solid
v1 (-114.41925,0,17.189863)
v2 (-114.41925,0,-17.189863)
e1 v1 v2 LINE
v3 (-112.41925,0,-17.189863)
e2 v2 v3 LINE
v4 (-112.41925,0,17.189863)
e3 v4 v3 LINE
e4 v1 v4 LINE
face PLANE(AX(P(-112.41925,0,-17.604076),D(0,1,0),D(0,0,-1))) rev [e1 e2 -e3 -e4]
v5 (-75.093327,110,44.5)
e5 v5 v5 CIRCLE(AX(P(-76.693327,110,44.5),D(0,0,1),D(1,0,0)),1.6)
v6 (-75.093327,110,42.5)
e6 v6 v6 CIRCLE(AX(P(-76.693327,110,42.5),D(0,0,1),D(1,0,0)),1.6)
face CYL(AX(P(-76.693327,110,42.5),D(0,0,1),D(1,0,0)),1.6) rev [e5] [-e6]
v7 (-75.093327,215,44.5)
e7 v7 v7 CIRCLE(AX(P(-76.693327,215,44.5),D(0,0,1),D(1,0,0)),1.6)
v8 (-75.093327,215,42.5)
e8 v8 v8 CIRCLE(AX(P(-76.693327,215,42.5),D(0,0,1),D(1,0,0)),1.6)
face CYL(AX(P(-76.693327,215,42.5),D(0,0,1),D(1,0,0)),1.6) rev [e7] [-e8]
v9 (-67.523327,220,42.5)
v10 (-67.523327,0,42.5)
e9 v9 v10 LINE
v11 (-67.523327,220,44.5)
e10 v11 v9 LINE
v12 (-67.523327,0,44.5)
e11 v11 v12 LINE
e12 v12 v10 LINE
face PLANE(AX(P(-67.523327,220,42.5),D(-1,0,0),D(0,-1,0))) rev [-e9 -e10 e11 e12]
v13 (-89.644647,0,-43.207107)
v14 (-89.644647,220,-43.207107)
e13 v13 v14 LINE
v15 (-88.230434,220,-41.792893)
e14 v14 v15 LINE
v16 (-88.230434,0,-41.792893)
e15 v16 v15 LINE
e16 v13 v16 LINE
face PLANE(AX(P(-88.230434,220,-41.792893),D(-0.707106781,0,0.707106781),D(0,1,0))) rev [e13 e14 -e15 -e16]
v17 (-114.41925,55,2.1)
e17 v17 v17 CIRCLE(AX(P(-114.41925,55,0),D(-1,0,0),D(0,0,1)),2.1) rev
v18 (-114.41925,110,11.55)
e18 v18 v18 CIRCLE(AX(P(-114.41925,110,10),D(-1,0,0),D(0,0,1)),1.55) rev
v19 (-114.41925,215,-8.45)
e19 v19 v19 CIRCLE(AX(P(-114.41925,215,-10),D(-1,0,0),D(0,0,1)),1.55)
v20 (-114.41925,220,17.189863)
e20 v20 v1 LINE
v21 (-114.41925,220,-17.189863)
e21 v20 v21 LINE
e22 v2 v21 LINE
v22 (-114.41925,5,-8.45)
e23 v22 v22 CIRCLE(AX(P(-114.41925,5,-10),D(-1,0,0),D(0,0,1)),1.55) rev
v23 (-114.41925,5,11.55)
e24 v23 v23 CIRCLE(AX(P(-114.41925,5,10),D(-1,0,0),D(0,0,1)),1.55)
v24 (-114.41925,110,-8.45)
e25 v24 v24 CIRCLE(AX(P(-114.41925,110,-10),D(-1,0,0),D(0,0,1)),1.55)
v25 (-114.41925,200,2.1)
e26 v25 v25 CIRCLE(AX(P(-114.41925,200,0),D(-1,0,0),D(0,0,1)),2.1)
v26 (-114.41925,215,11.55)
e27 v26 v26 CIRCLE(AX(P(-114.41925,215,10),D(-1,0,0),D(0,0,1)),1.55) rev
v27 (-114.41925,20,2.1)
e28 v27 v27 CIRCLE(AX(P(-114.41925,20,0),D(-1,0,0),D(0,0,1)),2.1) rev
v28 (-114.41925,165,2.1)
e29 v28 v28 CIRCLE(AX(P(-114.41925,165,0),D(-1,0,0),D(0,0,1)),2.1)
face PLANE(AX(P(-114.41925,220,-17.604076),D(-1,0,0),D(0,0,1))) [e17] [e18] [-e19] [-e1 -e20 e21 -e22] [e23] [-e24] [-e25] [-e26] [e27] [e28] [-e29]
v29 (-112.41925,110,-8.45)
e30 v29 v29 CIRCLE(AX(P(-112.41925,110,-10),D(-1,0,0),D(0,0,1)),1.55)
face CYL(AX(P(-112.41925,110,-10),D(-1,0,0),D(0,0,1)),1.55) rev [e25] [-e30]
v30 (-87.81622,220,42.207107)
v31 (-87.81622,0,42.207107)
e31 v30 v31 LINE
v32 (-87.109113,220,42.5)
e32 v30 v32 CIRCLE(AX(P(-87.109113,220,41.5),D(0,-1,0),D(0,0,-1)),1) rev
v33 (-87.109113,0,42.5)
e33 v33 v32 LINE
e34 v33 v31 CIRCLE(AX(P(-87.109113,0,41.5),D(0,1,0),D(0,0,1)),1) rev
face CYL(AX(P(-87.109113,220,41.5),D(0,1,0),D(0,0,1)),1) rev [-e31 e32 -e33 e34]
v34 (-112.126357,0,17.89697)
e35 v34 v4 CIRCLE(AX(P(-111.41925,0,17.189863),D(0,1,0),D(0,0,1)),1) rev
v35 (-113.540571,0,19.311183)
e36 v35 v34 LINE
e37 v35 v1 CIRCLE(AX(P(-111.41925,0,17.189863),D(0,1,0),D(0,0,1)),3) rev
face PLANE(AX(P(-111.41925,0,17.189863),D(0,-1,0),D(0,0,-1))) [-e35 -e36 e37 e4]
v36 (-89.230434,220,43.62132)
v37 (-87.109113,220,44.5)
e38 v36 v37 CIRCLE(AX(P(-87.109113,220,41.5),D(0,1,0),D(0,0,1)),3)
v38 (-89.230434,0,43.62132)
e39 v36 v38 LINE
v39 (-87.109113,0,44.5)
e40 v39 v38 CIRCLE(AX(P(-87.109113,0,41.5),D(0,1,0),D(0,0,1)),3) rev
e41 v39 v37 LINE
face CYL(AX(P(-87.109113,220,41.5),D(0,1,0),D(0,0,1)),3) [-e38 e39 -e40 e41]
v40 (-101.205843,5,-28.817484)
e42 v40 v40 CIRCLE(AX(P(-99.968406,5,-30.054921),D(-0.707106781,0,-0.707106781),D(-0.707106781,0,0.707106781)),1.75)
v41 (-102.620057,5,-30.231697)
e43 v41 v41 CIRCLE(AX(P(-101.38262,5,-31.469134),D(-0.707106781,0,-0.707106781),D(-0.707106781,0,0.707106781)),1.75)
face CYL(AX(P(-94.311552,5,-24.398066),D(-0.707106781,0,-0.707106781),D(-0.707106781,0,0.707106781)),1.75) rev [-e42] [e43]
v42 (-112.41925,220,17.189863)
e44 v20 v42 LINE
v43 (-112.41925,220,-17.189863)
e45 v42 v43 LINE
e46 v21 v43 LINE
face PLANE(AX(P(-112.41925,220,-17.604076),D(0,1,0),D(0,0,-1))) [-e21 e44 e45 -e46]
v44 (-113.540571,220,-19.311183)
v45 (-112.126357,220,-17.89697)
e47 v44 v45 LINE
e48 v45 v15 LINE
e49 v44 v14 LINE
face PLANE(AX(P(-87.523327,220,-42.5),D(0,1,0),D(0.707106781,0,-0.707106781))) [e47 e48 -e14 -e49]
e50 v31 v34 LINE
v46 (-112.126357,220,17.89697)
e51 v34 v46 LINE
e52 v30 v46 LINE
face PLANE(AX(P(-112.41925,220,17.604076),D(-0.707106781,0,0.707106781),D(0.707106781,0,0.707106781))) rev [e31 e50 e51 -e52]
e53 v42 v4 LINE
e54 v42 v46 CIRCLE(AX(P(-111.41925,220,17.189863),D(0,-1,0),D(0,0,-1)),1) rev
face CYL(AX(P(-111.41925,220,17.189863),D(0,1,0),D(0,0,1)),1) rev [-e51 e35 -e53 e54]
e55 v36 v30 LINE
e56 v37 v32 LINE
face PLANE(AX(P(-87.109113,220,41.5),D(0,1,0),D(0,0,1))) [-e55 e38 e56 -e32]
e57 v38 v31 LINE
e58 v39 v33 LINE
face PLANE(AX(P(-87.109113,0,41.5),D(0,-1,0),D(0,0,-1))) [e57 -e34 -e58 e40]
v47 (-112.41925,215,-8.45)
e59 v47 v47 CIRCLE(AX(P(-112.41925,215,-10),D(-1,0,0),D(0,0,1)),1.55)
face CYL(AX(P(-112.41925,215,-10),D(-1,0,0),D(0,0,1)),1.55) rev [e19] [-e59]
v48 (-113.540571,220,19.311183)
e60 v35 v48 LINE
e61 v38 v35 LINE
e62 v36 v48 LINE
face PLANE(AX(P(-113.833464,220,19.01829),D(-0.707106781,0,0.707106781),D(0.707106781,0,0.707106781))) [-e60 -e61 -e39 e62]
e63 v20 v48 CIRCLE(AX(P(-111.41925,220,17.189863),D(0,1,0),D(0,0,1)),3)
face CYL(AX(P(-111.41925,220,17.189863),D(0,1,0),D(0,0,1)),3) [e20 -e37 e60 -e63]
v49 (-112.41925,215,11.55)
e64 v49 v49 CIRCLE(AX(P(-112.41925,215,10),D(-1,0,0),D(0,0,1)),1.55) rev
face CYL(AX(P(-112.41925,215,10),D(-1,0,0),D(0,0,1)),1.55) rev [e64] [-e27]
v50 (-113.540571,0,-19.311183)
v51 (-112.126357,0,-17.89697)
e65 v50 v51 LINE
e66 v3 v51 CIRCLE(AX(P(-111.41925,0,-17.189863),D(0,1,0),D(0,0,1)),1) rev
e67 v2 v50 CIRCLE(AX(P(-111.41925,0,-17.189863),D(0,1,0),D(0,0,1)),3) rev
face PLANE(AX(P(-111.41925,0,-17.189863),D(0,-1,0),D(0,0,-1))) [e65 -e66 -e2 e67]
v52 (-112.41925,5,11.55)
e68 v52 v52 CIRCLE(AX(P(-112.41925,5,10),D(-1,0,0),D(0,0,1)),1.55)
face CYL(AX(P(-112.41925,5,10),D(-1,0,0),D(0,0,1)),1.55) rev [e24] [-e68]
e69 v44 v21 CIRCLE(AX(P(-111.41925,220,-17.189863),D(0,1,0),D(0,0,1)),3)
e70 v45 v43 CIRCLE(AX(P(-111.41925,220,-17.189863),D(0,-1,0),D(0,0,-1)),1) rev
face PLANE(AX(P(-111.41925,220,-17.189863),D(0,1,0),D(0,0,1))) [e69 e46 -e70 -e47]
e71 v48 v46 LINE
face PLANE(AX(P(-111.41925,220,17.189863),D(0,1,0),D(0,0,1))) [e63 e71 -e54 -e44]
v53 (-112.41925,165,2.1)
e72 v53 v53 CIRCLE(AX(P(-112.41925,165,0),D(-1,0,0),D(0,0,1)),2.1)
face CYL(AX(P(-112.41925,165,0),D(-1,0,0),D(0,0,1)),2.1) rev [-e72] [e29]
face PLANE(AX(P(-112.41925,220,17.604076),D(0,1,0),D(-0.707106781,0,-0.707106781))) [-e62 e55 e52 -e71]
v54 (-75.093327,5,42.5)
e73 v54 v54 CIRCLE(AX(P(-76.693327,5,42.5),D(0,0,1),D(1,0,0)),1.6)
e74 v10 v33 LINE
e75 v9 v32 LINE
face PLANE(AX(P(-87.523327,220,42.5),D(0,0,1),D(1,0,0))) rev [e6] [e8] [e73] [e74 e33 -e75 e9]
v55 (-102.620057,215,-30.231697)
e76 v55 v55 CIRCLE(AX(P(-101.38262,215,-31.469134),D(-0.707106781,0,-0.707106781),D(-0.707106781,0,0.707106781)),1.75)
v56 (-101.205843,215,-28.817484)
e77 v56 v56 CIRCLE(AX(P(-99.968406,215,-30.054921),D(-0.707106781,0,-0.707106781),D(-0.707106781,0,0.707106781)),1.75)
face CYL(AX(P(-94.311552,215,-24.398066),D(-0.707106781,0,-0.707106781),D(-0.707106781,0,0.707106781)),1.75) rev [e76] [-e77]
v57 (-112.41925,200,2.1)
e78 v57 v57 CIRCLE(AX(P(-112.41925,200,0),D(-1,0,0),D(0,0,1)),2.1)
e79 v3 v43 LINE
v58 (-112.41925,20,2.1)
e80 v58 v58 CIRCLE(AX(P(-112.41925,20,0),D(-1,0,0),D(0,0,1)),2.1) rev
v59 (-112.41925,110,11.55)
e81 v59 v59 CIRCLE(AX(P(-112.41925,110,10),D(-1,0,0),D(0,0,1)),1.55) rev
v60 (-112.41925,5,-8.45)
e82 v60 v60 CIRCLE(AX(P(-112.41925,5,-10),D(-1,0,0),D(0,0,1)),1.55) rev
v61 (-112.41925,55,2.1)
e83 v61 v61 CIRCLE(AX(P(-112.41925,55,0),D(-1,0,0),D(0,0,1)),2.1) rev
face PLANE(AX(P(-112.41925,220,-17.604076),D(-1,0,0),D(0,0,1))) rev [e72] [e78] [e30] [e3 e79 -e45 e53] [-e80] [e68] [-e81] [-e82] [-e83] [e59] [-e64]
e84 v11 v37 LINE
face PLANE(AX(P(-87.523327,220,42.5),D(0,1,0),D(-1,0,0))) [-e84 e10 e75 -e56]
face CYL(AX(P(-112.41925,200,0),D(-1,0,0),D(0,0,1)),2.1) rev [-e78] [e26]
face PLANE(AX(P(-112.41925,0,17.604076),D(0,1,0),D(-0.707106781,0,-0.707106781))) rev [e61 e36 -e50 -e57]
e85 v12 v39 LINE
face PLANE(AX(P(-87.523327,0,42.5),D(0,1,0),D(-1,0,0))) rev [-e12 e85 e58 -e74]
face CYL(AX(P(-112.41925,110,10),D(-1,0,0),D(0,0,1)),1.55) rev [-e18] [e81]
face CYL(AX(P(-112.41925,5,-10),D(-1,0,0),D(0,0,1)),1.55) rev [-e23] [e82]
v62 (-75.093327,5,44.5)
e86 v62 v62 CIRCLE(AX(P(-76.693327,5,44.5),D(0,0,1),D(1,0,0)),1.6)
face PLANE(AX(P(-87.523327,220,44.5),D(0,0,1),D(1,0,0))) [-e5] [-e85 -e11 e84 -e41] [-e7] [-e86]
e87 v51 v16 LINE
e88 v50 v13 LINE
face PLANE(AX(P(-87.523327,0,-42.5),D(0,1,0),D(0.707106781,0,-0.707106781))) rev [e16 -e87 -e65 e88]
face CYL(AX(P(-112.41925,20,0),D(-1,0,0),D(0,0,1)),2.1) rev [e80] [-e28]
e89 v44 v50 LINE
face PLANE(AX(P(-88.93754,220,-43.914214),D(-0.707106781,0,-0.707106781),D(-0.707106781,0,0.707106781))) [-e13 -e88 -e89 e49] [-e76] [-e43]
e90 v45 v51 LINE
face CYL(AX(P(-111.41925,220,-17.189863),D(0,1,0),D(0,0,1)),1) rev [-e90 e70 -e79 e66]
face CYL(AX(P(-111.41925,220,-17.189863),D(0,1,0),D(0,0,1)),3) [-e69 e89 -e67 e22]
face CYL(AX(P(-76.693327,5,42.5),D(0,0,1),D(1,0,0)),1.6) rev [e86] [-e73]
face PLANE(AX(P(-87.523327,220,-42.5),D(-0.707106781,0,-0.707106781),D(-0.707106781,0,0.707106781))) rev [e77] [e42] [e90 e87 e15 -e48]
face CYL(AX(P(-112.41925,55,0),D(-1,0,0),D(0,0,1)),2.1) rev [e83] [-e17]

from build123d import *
from build123d.topology import SkipClean

# Parameters (mm, degrees)
EXTRUDE_1_DEPTH             = 220
SKETCH_3_R                  = 1.55
SKETCH_3_R_2                = 2.1
CUT_EXTRUDE_1_DEPTH         = 10
SKETCH_6_R                  = 1.6
CUT_EXTRUDE_2_DEPTH         = 10
CHAMFER_1_SIZE              = 1
CHAMFER_1_SIZE2             = 0.707106781
SHEET_START                 = -114.419250373
SHEET_METAL_2_OUTLINE_W     = 220
SHEET_METAL_2_OUTLINE_H     = 86.5
SHEET_METAL_2_OUTLINE_R     = 1.55
SHEET_METAL_2_OUTLINE_R_2   = 2.1
SHEET_METAL_2_DEPTH         = 26.274603255
SHEET_START_2               = -87.816219993
SHEET_METAL_2_2_OUTLINE_W   = 220
SHEET_METAL_2_2_OUTLINE_H   = 87
SHEET_METAL_2_2_OUTLINE_R   = 1.55
SHEET_METAL_2_2_OUTLINE_R_2 = 2.1
SHEET_METAL_2_2_DEPTH       = 0.483052927
SHEET_START_3               = -89.230433555
SHEET_METAL_2_3_OUTLINE_W   = 220
SHEET_METAL_2_3_OUTLINE_H   = 0.5
SHEET_METAL_2_3_DEPTH       = 21.707106781
SHEET_METAL_2_4_DEPTH       = 220
SHEET_METAL_2_5_DEPTH       = 220
SHEET_START_4               = 44
SHEET_METAL_2_6_OUTLINE_R   = 1.6
SHEET_METAL_2_6_DEPTH       = 0.5
SKETCH_7_R                  = 1.75
CUT_EXTRUDE_3_DEPTH         = 10


with BuildPart() as part:
    # 草图2 → 凸台-拉伸1 (new body)
    with BuildSketch(Plane(origin=(0, 0, 0), x_dir=(1, 0, 0), z_dir=(0, 1, 0))):
        Polygon((-87.523326774, 42.5), (-112.419250373, 17.604076401), (-112.419250373, -17.604076401), (-87.523326774, -42.5), (-67.523326774, -42.5), (-67.523326774, -44), (-88.144647118, -44), (-113.919250373, -18.225396744), (-113.919250373, 18.225396744), (-89.644647118, 42.5), align=None)
    extrude(amount=EXTRUDE_1_DEPTH)

    # Sketch 3 → 切除-拉伸1 (cut)
    with BuildSketch(Plane.ZY.offset(113.919250373)):
        with Locations((-10, 5)):
            Circle(SKETCH_3_R)
        with Locations((10, 5)):
            Circle(SKETCH_3_R)
        with BuildLine():
            ThreePointArc((-8.45, 110), (-10, 111.55), (-11.55, 110))
            Line((-11.55, 110), (-8.45, 110))
        make_face()
        with BuildLine():
            Line((-8.45, 110), (-11.55, 110))
            ThreePointArc((-11.55, 110), (-10, 108.45), (-8.45, 110))
        make_face()
        with BuildLine():
            ThreePointArc((8.45, 110), (10, 108.45), (11.55, 110))
            Line((11.55, 110), (8.45, 110))
        make_face()
        with BuildLine():
            Line((8.45, 110), (11.55, 110))
            ThreePointArc((11.55, 110), (10, 111.55), (8.45, 110))
        make_face()
        with Locations((-10, 215)):
            Circle(SKETCH_3_R)
        with Locations((10, 215)):
            Circle(SKETCH_3_R)
        with Locations((0, 200)):
            Circle(SKETCH_3_R_2)
        with Locations((0, 165)):
            Circle(SKETCH_3_R_2)
        with Locations((0, 55)):
            Circle(SKETCH_3_R_2)
        with Locations((0, 20)):
            Circle(SKETCH_3_R_2)
    extrude(amount=-CUT_EXTRUDE_1_DEPTH, mode=Mode.SUBTRACT)

    # 草图6 → 切除-拉伸2 (cut)
    with BuildSketch(Plane.XY.offset(44)):
        with Locations((-76.693326774, 5)):
            Circle(SKETCH_6_R)
        with Locations((-76.693326774, 110)):
            Circle(SKETCH_6_R)
        with Locations((-76.693326774, 215)):
            Circle(SKETCH_6_R)
    extrude(amount=-CUT_EXTRUDE_2_DEPTH, mode=Mode.SUBTRACT)

    # 倒角1
    chamfer_1_edges = [part.edges().sort_by_distance(p)[0] for p in [
        (-87.523326774, 110, -42.5),
    ]]
    chamfer_1_side = [part.faces().sort_by_distance(p)[0] for p in [
        (-99.971288574, 110, -30.0520382),
    ]]
    chamfer(chamfer_1_edges, length=CHAMFER_1_SIZE, length2=CHAMFER_1_SIZE2, reference=chamfer_1_side[0])

    # Sheet Metal 2: read off the stored shape, not the designer's step
    # Sheet Metal 2 outline → Sheet Metal 2 (add)
    with SkipClean():  # the faces are left unmerged after this step: merging them gives an invalid solid
        with BuildSketch(Plane.YZ.offset(SHEET_START)):
            with Locations((110, 0.75)):
                Rectangle(SHEET_METAL_2_OUTLINE_W, SHEET_METAL_2_OUTLINE_H)
            with Locations((5, -10)):
                Circle(SHEET_METAL_2_OUTLINE_R, mode=Mode.SUBTRACT)
            with Locations((20, 0)):
                Circle(SHEET_METAL_2_OUTLINE_R_2, mode=Mode.SUBTRACT)
            with Locations((55, 0)):
                Circle(SHEET_METAL_2_OUTLINE_R_2, mode=Mode.SUBTRACT)
            with Locations((110, -10)):
                Circle(SHEET_METAL_2_OUTLINE_R, mode=Mode.SUBTRACT)
            with Locations((215, -10)):
                Circle(SHEET_METAL_2_OUTLINE_R, mode=Mode.SUBTRACT)
            with Locations((165, 0)):
                Circle(SHEET_METAL_2_OUTLINE_R_2, mode=Mode.SUBTRACT)
            with Locations((200, 0)):
                Circle(SHEET_METAL_2_OUTLINE_R_2, mode=Mode.SUBTRACT)
            with Locations((5, 10)):
                Circle(SHEET_METAL_2_OUTLINE_R, mode=Mode.SUBTRACT)
            with Locations((110, 10)):
                Circle(SHEET_METAL_2_OUTLINE_R, mode=Mode.SUBTRACT)
            with Locations((215, 10)):
                Circle(SHEET_METAL_2_OUTLINE_R, mode=Mode.SUBTRACT)
        extrude(amount=SHEET_METAL_2_DEPTH)

    # Sheet Metal 2 2 outline → Sheet Metal 2 2 (add)
    with SkipClean():  # the faces are left unmerged after this step: merging them gives an invalid solid
        with BuildSketch(Plane.YZ.offset(SHEET_START_2)):
            with Locations((110, 1)):
                Rectangle(SHEET_METAL_2_2_OUTLINE_W, SHEET_METAL_2_2_OUTLINE_H)
            with Locations((5, -10)):
                Circle(SHEET_METAL_2_2_OUTLINE_R, mode=Mode.SUBTRACT)
            with Locations((20, 0)):
                Circle(SHEET_METAL_2_2_OUTLINE_R_2, mode=Mode.SUBTRACT)
            with Locations((55, 0)):
                Circle(SHEET_METAL_2_2_OUTLINE_R_2, mode=Mode.SUBTRACT)
            with Locations((110, -10)):
                Circle(SHEET_METAL_2_2_OUTLINE_R, mode=Mode.SUBTRACT)
            with Locations((215, -10)):
                Circle(SHEET_METAL_2_2_OUTLINE_R, mode=Mode.SUBTRACT)
            with Locations((165, 0)):
                Circle(SHEET_METAL_2_2_OUTLINE_R_2, mode=Mode.SUBTRACT)
            with Locations((200, 0)):
                Circle(SHEET_METAL_2_2_OUTLINE_R_2, mode=Mode.SUBTRACT)
            with Locations((5, 10)):
                Circle(SHEET_METAL_2_2_OUTLINE_R, mode=Mode.SUBTRACT)
            with Locations((110, 10)):
                Circle(SHEET_METAL_2_2_OUTLINE_R, mode=Mode.SUBTRACT)
            with Locations((215, 10)):
                Circle(SHEET_METAL_2_2_OUTLINE_R, mode=Mode.SUBTRACT)
        extrude(amount=SHEET_METAL_2_2_DEPTH)

    # Sheet Metal 2 3 outline → Sheet Metal 2 3 (add)
    with SkipClean():  # the faces are left unmerged after this step: merging them gives an invalid solid
        with BuildSketch(Plane.YZ.offset(SHEET_START_3)):
            with Locations((110, 44.25)):
                Rectangle(SHEET_METAL_2_3_OUTLINE_W, SHEET_METAL_2_3_OUTLINE_H)
        extrude(amount=SHEET_METAL_2_3_DEPTH)

    # Sheet Metal 2 4 outline → Sheet Metal 2 4 (cut)
    with BuildSketch(Plane(origin=(0, 0, 0), x_dir=(1, 0, 0), z_dir=(0, 1, 0))):
        with BuildLine():
            Line((-87.816219993, 42.5), (-87.816219993, -42.207106781))
            ThreePointArc((-87.816219993, -42.207106781), (-87.593520149, -42.374842797), (-87.333167066, -42.474576765))
            Line((-87.333167066, -42.474576765), (-87.333167066, 42.5))
            Line((-87.333167066, 42.5), (-87.816219993, 42.5))
        make_face()
        with BuildLine():
            Line((-88.144647118, 42.5), (-88.937540337, 42.5))
            Line((-88.937540337, 42.5), (-88.230433555, 41.792893219))
            Line((-88.230433555, 41.792893219), (-112.126357154, 17.89696962))
            ThreePointArc((-112.126357154, 17.89696962), (-112.343129906, 17.572546271), (-112.419250373, 17.189862838))
            Line((-112.419250373, 17.189862838), (-112.419250373, -17.189862838))
            ThreePointArc((-112.419250373, -17.189862838), (-112.343129906, -17.572546271), (-112.126357154, -17.89696962))
            Line((-112.126357154, -17.89696962), (-88.144647118, -41.878679656))
            Line((-88.144647118, -41.878679656), (-88.144647118, 42.5))
        make_face()
        with BuildLine():
            ThreePointArc((-113.540570717, -19.311183182), (-114.190888971, -18.337913135), (-114.419250373, -17.189862838))
            Line((-114.419250373, -17.189862838), (-114.419250373, -44))
            Line((-114.419250373, -44), (-89.230433555, -44))
            Line((-89.230433555, -44), (-89.230433555, -44.5))
            Line((-89.230433555, -44.5), (-87.109113212, -44.5))
            ThreePointArc((-87.109113212, -44.5), (-88.257163509, -44.271638598), (-89.230433555, -43.621320344))
            Line((-89.230433555, -43.621320344), (-113.540570717, -19.311183182))
        make_face()
        with BuildLine():
            Line((-113.540570717, 19.311183182), (-90.351753899, 42.5))
            Line((-90.351753899, 42.5), (-114.419250373, 42.5))
            Line((-114.419250373, 42.5), (-114.419250373, 17.189862838))
            ThreePointArc((-114.419250373, 17.189862838), (-114.190888971, 18.337913135), (-113.540570717, 19.311183182))
        make_face()
    extrude(amount=SHEET_METAL_2_4_DEPTH, mode=Mode.SUBTRACT)

    # Sheet Metal 2 5 outline → Sheet Metal 2 5 (add)
    with BuildSketch(Plane(origin=(0, 0, 0), x_dir=(1, 0, 0), z_dir=(0, 1, 0))):
        with BuildLine():
            ThreePointArc((-87.109113212, -42.5), (-87.221859022, -42.493623864), (-87.333167066, -42.474576765))
            Line((-87.333167066, -42.474576765), (-87.333167066, -42.5))
            Line((-87.333167066, -42.5), (-87.109113212, -42.5))
        make_face()
        Polygon((-88.937540337, 42.5), (-89.644647118, 43.207106781), (-90.351753899, 42.5), align=None)
    extrude(amount=SHEET_METAL_2_5_DEPTH)

    # Sheet Metal 2 6 outline → Sheet Metal 2 6 (cut)
    with BuildSketch(Plane.XY.offset(SHEET_START_4)):
        with Locations((-76.693326774, 5)):
            Circle(SHEET_METAL_2_6_OUTLINE_R)
        with Locations((-76.693326774, 110)):
            Circle(SHEET_METAL_2_6_OUTLINE_R)
        with Locations((-76.693326774, 215)):
            Circle(SHEET_METAL_2_6_OUTLINE_R)
    extrude(amount=SHEET_METAL_2_6_DEPTH, mode=Mode.SUBTRACT)

    # 草图7 → 切除-拉伸3 (cut)
    with BuildSketch(Plane(origin=(-66.425876949, 0, -66.425876949), x_dir=(-0.7071067811865474, 0, 0.7071067811865477), z_dir=(-0.7071067811865477, 0, -0.7071067811865474))):
        with Locations((49.436299673, 215)):
            Circle(SKETCH_7_R)
        with Locations((49.436299673, 5)):
            Circle(SKETCH_7_R)
    extrude(amount=-CUT_EXTRUDE_3_DEPTH, mode=Mode.SUBTRACT)


solid = part.part
